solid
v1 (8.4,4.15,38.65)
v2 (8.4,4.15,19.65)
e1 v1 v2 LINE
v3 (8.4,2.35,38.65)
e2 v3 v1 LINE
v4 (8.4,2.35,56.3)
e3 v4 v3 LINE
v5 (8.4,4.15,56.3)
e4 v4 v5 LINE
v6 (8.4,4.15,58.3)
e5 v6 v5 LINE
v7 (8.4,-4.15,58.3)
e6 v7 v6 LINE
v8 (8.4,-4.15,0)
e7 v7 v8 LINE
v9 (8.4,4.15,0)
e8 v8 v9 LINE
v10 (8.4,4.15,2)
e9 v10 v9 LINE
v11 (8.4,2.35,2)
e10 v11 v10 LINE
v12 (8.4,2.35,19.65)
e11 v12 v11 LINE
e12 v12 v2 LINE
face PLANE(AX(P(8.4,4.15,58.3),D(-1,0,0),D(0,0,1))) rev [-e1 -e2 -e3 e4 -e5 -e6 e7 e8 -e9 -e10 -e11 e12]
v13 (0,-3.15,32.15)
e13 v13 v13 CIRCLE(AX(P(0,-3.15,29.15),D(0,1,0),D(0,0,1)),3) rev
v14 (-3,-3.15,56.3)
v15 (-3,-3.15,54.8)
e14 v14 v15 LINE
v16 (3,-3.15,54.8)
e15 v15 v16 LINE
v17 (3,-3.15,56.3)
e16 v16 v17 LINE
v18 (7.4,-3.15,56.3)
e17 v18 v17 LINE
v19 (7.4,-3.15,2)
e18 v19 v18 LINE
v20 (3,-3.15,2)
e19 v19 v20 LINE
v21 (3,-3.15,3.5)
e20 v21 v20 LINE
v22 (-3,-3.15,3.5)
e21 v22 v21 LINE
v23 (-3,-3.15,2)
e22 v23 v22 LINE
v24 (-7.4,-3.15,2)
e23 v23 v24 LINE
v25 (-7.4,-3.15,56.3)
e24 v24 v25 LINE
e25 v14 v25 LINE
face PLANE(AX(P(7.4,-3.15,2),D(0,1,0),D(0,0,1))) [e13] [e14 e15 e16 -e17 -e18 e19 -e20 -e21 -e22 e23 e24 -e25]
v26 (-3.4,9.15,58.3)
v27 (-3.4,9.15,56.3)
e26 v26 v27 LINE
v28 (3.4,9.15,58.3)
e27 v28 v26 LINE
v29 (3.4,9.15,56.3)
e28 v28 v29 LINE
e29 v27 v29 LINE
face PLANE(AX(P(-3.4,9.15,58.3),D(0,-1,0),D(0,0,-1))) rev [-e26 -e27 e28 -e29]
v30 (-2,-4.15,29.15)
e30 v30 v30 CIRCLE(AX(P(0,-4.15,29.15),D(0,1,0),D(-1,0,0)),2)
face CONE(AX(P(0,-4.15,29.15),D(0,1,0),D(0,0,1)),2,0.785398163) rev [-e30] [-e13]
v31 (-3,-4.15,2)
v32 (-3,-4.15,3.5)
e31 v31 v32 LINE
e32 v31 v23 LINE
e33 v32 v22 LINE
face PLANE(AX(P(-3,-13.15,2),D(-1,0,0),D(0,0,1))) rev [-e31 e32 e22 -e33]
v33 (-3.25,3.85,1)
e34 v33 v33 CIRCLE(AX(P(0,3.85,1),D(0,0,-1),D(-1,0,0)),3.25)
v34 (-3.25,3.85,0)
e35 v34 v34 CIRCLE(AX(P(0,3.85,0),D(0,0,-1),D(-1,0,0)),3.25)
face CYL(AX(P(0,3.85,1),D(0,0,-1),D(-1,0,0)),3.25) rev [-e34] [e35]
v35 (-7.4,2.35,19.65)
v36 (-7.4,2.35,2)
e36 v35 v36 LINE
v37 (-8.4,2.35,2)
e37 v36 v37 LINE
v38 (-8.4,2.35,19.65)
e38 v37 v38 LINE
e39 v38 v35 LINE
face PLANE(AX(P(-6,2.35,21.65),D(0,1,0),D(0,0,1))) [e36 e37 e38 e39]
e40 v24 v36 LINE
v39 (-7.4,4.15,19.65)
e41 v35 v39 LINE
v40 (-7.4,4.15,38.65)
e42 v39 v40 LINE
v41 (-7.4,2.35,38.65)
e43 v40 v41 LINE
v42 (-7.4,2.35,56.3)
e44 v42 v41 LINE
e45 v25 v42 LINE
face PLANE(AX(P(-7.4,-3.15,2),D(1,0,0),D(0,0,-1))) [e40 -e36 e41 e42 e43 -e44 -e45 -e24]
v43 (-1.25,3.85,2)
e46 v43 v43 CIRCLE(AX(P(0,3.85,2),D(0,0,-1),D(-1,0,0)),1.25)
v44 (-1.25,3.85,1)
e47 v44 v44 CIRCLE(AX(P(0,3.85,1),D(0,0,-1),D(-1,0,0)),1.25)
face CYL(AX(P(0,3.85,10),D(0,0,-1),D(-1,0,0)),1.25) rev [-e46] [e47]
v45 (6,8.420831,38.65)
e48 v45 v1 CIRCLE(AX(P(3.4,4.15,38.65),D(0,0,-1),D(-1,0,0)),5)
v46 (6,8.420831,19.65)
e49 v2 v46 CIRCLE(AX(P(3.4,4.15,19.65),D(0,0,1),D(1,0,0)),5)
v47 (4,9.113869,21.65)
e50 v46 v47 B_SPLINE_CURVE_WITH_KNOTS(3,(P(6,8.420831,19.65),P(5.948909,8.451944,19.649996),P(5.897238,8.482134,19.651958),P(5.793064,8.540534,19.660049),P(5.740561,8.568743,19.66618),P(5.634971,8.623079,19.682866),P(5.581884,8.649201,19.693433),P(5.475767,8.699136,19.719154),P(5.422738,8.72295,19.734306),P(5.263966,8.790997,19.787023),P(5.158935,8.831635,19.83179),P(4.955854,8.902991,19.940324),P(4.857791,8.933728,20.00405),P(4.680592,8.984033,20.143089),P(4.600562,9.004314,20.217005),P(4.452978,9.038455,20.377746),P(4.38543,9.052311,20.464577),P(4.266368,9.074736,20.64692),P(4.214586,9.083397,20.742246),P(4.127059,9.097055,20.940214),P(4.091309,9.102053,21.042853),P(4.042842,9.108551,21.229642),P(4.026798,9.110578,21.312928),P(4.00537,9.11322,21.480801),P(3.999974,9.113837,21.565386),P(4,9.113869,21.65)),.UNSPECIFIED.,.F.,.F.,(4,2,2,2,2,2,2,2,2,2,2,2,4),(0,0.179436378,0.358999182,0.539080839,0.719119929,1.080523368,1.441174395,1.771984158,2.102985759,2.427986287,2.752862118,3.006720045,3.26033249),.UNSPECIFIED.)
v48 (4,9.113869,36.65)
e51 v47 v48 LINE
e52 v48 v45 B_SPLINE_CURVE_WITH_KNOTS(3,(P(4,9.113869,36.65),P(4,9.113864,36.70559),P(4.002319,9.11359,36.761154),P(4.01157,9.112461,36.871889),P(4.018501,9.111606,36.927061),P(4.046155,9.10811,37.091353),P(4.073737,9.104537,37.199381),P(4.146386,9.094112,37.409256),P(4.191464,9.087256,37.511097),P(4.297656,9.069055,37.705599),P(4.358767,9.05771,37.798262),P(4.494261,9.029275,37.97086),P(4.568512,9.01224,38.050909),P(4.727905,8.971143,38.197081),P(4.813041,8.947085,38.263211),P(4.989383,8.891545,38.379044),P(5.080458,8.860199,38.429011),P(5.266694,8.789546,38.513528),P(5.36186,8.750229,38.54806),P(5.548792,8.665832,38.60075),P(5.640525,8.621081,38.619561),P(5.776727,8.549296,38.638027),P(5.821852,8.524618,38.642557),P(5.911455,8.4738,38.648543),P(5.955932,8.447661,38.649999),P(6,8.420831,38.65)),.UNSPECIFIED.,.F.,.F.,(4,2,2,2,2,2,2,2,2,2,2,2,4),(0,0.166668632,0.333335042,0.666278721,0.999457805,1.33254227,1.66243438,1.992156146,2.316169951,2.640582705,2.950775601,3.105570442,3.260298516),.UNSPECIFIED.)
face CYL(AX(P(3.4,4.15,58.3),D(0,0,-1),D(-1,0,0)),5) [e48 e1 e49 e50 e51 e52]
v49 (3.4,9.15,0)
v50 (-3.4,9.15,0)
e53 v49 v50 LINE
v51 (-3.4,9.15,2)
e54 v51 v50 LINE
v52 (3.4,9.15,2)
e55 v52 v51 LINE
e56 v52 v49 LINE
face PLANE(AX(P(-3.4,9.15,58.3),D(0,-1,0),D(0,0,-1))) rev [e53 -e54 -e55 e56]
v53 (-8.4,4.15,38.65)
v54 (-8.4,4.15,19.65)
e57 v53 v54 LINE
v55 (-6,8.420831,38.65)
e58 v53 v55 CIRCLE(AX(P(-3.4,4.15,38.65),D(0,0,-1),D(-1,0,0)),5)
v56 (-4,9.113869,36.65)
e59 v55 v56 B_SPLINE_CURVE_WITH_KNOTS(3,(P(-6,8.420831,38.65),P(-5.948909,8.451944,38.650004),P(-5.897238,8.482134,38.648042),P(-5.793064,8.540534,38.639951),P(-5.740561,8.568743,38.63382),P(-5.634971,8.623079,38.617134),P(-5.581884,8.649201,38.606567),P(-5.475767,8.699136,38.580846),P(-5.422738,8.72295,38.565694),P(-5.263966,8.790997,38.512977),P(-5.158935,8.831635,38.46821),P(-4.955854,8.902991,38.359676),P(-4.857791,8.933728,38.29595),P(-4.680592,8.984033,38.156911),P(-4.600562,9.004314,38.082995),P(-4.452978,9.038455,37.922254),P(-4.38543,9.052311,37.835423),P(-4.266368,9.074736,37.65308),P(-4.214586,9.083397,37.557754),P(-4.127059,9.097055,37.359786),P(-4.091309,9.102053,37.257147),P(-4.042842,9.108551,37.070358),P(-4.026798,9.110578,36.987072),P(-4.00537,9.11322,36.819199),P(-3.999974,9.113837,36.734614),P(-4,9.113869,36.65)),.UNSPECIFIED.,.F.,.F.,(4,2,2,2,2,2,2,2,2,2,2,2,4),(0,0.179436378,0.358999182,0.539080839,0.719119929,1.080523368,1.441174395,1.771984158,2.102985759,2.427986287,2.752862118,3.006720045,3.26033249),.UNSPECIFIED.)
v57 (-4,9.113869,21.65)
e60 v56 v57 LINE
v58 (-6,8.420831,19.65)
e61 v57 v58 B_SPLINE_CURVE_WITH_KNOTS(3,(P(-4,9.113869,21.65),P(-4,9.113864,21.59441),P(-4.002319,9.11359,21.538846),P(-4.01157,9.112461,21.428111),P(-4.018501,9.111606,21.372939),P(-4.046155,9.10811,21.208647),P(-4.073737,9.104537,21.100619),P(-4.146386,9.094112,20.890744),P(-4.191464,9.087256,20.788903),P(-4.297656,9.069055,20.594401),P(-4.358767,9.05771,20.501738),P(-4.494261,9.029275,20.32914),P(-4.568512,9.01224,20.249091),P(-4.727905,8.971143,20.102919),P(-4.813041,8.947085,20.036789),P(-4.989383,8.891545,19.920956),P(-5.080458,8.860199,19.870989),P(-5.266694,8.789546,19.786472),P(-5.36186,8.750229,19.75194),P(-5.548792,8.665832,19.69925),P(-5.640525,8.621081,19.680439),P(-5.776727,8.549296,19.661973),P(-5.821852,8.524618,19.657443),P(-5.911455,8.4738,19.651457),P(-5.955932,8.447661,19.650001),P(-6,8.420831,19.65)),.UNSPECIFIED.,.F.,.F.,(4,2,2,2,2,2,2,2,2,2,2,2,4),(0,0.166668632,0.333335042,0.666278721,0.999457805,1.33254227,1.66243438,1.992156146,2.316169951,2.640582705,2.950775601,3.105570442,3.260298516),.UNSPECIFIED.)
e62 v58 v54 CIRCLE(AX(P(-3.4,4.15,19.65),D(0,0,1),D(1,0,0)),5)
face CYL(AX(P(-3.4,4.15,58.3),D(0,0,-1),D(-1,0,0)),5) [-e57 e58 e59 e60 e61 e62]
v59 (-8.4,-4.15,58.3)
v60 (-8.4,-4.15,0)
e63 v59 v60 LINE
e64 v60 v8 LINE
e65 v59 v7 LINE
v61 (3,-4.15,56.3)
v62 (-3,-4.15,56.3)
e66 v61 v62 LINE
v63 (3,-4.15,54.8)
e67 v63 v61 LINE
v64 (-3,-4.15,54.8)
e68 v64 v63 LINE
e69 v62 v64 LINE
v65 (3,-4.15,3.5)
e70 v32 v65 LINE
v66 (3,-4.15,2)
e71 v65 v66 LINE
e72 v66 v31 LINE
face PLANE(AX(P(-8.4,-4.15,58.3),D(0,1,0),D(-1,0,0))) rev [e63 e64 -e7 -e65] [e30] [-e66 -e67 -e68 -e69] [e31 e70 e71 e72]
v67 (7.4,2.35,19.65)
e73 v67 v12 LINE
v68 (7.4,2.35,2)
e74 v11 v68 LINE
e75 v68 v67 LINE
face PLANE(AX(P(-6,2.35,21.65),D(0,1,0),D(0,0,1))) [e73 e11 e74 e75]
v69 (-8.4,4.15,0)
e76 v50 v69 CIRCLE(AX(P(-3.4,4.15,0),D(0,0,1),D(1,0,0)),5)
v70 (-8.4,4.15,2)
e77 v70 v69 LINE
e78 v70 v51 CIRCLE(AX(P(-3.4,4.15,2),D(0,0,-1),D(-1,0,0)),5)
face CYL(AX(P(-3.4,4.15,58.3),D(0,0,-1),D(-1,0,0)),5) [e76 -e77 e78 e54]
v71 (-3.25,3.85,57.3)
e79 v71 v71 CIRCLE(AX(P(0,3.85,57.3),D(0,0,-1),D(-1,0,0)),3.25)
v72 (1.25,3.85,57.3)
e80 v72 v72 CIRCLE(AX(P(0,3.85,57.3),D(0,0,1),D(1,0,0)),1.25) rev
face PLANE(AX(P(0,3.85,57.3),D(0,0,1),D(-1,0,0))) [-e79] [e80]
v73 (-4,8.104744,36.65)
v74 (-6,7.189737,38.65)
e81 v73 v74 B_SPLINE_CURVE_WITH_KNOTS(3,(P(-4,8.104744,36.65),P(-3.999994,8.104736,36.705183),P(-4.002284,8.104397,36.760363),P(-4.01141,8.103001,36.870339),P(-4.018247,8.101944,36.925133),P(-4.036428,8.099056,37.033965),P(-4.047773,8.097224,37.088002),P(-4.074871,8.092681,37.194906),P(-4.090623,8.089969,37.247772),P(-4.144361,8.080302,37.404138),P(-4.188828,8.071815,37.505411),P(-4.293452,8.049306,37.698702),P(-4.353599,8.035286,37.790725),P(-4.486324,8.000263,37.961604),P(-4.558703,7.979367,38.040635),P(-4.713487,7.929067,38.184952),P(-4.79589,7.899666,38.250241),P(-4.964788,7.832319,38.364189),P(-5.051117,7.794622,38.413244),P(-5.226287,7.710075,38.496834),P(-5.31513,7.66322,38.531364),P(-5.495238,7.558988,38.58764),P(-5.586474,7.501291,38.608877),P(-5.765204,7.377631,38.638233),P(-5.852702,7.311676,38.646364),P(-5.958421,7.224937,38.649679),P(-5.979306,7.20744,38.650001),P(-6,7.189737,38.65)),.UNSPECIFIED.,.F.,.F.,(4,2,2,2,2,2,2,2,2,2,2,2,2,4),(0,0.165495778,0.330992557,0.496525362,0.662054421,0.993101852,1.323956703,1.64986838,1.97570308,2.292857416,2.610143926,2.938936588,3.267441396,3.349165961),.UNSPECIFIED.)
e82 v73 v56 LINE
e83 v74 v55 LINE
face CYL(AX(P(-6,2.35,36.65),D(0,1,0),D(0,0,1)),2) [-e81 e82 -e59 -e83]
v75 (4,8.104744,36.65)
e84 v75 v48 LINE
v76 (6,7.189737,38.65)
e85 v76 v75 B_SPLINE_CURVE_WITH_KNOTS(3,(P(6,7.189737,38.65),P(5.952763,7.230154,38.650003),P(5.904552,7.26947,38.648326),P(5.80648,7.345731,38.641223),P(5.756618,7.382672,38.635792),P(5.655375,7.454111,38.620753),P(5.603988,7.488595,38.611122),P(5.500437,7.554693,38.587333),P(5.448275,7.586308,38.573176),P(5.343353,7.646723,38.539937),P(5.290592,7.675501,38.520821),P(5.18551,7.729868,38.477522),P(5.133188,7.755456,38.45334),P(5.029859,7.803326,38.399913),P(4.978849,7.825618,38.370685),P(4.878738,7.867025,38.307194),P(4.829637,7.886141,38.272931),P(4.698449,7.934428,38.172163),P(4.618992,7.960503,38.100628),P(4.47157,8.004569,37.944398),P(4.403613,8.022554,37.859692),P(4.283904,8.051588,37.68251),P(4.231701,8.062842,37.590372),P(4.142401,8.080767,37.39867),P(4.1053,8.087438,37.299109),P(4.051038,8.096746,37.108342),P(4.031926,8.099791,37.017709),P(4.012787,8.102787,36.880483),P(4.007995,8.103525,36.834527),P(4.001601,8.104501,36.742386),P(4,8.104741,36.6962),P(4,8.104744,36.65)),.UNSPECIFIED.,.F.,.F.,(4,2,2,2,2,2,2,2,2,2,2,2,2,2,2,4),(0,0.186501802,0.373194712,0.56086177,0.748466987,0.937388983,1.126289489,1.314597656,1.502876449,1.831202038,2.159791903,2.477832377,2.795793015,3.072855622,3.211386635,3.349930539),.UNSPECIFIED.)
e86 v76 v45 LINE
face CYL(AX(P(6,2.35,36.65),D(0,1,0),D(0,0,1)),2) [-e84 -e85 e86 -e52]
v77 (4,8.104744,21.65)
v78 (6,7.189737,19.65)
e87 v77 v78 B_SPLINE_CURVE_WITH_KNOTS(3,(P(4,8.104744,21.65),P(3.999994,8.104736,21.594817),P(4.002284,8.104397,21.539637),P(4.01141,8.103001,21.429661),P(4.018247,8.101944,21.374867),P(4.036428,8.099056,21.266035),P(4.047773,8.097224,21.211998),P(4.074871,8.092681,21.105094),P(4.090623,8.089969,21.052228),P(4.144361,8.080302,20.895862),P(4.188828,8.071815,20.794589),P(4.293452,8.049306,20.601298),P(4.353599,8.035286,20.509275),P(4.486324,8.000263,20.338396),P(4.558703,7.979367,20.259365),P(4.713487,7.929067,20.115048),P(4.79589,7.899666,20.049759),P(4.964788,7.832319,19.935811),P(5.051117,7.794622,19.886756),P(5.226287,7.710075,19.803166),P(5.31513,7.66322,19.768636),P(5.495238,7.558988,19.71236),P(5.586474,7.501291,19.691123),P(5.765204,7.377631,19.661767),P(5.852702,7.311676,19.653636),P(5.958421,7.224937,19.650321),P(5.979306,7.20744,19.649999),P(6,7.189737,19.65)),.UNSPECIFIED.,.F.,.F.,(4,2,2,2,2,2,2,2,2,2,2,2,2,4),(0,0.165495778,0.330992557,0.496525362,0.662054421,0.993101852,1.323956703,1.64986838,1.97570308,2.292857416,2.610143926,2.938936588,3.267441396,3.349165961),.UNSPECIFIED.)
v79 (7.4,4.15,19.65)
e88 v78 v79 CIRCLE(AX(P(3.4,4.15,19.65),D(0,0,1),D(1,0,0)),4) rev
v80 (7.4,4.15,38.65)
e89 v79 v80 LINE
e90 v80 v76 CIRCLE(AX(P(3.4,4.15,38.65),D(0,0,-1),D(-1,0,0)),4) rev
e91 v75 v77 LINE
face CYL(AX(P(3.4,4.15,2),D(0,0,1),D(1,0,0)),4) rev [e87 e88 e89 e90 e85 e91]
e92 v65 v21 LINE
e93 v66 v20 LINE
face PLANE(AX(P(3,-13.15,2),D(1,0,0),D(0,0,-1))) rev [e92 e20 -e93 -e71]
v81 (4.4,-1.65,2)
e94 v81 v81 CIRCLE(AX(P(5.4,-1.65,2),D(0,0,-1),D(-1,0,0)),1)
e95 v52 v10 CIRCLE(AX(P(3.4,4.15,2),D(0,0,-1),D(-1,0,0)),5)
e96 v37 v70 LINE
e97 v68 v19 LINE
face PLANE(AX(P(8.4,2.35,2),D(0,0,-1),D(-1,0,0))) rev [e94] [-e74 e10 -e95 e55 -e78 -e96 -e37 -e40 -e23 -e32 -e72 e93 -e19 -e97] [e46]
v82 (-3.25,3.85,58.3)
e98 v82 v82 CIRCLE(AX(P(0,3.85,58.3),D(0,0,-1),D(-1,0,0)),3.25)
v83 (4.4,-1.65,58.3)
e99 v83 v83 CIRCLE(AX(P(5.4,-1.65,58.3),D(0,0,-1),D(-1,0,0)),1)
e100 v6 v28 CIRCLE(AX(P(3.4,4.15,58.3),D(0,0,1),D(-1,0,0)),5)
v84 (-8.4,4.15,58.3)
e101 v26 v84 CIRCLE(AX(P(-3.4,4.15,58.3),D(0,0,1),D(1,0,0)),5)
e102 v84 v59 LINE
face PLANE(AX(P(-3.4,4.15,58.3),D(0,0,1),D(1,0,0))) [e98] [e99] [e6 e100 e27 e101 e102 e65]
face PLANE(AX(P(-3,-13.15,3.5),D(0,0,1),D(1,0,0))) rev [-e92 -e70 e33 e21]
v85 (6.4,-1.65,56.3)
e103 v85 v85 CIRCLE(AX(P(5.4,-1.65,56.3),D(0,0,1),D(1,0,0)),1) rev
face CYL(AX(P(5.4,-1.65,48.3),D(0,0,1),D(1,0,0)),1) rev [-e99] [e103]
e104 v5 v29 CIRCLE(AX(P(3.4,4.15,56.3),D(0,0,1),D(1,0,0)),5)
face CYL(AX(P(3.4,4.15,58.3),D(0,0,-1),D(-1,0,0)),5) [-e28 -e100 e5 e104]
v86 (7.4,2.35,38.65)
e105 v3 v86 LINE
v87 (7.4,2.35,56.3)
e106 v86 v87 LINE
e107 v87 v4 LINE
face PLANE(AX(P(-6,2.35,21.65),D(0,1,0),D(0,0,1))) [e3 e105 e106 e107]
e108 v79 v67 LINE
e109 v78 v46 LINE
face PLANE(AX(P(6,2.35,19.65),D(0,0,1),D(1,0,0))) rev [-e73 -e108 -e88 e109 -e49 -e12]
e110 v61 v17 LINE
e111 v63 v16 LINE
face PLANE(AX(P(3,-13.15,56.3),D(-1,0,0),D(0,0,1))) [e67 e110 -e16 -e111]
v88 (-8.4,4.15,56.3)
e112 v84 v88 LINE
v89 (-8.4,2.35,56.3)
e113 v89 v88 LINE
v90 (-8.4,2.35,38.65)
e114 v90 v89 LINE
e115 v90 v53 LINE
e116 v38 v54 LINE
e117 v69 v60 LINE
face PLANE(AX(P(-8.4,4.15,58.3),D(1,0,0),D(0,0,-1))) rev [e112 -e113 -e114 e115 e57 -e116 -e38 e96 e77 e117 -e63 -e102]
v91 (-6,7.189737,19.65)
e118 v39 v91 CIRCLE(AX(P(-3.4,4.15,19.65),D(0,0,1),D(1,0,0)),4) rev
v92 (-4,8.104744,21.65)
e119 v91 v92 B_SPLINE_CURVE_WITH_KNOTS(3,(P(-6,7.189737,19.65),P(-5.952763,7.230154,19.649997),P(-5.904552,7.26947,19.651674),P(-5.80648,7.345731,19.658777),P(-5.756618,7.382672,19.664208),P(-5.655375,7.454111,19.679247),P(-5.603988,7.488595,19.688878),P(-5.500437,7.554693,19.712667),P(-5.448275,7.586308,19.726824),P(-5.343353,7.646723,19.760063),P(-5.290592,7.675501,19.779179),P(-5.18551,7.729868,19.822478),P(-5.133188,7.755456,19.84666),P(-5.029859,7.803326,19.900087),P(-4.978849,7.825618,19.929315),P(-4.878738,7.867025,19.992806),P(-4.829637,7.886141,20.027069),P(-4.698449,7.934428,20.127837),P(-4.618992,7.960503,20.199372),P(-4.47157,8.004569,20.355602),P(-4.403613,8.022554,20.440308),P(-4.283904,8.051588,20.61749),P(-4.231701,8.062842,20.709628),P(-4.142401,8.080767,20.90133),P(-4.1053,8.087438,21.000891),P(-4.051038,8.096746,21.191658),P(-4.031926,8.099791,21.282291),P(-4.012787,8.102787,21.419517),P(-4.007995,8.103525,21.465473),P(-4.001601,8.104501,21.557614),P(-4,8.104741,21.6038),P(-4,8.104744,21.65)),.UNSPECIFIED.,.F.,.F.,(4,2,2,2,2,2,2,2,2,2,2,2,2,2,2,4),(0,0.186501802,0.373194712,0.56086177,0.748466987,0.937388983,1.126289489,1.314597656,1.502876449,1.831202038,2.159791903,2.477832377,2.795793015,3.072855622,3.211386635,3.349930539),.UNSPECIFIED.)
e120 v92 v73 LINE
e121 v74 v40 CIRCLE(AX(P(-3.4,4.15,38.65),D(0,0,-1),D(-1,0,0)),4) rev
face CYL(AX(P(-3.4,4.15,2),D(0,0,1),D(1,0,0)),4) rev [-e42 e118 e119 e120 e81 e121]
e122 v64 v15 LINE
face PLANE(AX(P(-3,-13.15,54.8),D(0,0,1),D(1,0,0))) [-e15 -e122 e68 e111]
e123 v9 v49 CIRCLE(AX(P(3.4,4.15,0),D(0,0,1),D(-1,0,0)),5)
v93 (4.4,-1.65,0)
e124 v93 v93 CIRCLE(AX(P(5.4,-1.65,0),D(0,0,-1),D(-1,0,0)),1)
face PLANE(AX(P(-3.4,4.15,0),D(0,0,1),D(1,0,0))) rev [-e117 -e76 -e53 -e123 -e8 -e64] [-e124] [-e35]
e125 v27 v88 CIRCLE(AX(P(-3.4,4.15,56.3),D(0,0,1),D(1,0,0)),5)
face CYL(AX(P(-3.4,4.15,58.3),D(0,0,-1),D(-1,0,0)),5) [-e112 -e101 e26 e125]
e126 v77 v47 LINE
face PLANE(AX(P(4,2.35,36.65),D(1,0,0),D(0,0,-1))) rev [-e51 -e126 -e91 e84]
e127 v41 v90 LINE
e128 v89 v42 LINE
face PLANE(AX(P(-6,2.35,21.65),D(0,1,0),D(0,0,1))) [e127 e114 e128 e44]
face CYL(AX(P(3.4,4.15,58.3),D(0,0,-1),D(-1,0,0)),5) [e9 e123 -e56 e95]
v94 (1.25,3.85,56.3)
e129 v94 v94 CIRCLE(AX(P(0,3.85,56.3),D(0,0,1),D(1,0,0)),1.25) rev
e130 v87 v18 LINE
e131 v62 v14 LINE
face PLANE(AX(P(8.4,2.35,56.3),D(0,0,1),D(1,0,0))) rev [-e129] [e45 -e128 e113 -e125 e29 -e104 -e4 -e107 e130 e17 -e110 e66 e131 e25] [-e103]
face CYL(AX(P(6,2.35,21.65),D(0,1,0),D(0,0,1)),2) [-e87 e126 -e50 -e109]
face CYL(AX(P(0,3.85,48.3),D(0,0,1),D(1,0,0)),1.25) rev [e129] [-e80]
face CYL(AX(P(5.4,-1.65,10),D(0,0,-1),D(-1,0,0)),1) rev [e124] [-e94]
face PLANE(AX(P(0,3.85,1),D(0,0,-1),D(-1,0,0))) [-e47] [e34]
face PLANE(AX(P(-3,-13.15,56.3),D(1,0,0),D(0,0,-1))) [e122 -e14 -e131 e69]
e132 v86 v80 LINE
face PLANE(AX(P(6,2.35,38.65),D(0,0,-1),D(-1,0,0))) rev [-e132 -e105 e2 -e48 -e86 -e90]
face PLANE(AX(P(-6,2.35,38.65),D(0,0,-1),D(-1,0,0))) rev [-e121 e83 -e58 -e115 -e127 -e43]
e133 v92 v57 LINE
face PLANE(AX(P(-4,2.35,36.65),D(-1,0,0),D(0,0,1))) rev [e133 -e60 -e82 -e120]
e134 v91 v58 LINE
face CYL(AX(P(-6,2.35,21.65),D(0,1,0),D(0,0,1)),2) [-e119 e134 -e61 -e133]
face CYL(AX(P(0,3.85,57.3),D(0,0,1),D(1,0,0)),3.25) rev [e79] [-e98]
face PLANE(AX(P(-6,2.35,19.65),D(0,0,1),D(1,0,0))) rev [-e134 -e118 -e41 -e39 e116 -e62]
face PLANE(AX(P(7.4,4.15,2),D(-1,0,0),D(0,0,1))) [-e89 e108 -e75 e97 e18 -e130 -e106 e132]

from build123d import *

# Parameters (mm, degrees)
EXTRUDE_1_DEPTH     = 58.3
CUT_EXTRUDE_1_DEPTH = 6.8
CUT_EXTRUDE_2_DEPTH = 54.3
SKETCH_5_R          = 2
CUT_EXTRUDE_4_DEPTH = 55
CHAMFER_2_SIZE      = 1
SKETCH_7_R          = 3.25
CUT_EXTRUDE_5_DEPTH = 1
SKETCH_8_R          = 1.25
CUT_EXTRUDE_6_DEPTH = 10
SKETCH_9_R          = 1
CUT_EXTRUDE_7_DEPTH = 10
SKETCH_11_W         = 6
SKETCH_11_H         = 1.5
CUT_EXTRUDE_8_DEPTH = 10


with BuildPart() as part:
    # Эскиз1 → Бобышка-Вытянуть1 (new body)
    with BuildSketch(Plane.XY):
        with BuildLine():
            Line((-3.4, 9.15), (3.4, 9.15))
            ThreePointArc((3.4, 9.15), (6.935533906, 7.685533906), (8.4, 4.15))
            Line((8.4, 4.15), (8.4, -4.15))
            Line((8.4, -4.15), (-8.4, -4.15))
            Line((-8.4, -4.15), (-8.4, 4.15))
            ThreePointArc((-8.4, 4.15), (-6.935533906, 7.685533906), (-3.4, 9.15))
        make_face()
    extrude(amount=EXTRUDE_1_DEPTH)

    # Эскиз2 → Вырез-Вытянуть1 (cut)
    with BuildSketch(Plane(origin=(0, 9.15, 0), x_dir=(1, 0, 0), z_dir=(0, 1, 0))):
        with BuildLine():
            Line((8.4, -19.65), (8.4, -2))
            Line((8.4, -2), (-8.4, -2))
            Line((-8.4, -2), (-8.4, -19.65))
            Line((-8.4, -19.65), (-6, -19.65))
            ThreePointArc((-6, -19.65), (-4.585786438, -20.235786438), (-4, -21.65))
            Line((-4, -21.65), (-4, -36.65))
            ThreePointArc((-4, -36.65), (-4.585786438, -38.064213562), (-6, -38.65))
            Line((-6, -38.65), (-8.4, -38.65))
            Line((-8.4, -38.65), (-8.4, -56.3))
            Line((-8.4, -56.3), (8.4, -56.3))
            Line((8.4, -56.3), (8.4, -38.65))
            Line((8.4, -38.65), (6, -38.65))
            ThreePointArc((6, -38.65), (4.585786438, -38.064213562), (4, -36.65))
            Line((4, -36.65), (4, -21.65))
            ThreePointArc((4, -21.65), (4.585786438, -20.235786438), (6, -19.65))
            Line((6, -19.65), (8.4, -19.65))
        make_face()
    extrude(amount=-CUT_EXTRUDE_1_DEPTH, mode=Mode.SUBTRACT)

    # Эскиз3 → Вырез-Вытянуть2 (cut)
    with BuildSketch(Plane(origin=(0, 0, 56.3), x_dir=(-1, 0, 0), z_dir=(0, 0, -1))):
        with BuildLine():
            Line((-7.4, 4.15), (-7.4, -3.15))
            Line((-7.4, -3.15), (7.4, -3.15))
            Line((7.4, -3.15), (7.4, 4.15))
            ThreePointArc((7.4, 4.15), (6.228427125, 6.978427125), (3.4, 8.15))
            Line((3.4, 8.15), (-3.4, 8.15))
            ThreePointArc((-3.4, 8.15), (-6.228427125, 6.978427125), (-7.4, 4.15))
        make_face()
    extrude(amount=CUT_EXTRUDE_2_DEPTH, mode=Mode.SUBTRACT)

    # Эскиз5 → Вырез-Вытянуть4 (cut)
    with BuildSketch(Plane(origin=(0, -3.15, 0), x_dir=(1, 0, 0), z_dir=(0, 1, 0))):
        with Locations(Location((0, -29.15, 0), (0, 0, 270))):
            Circle(SKETCH_5_R)
    extrude(amount=-CUT_EXTRUDE_4_DEPTH, mode=Mode.SUBTRACT)

    # Фаска2
    chamfer_2_edges = [part.edges().sort_by_distance(p)[0] for p in [
        (0, -3.15, 27.15),
    ]]
    chamfer(chamfer_2_edges, length=CHAMFER_2_SIZE - 0.0001)  # a hair under: the kernel refuses the full size

    # Эскиз7 → Вырез-Вытянуть5 (cut)
    with BuildSketch(Plane(origin=(0, 0, 0), x_dir=(-1, 0, 0), z_dir=(0, 0, -1))):
        with Locations((0, 3.85)):
            Circle(SKETCH_7_R)
    cut_extrude_5 = extrude(amount=-CUT_EXTRUDE_5_DEPTH, mode=Mode.SUBTRACT)

    # Эскиз8 → Вырез-Вытянуть6 (cut)
    with BuildSketch(Plane(origin=(0, 0, 0), x_dir=(-1, 0, 0), z_dir=(0, 0, -1))):
        with Locations((0, 3.85)):
            Circle(SKETCH_8_R)
    cut_extrude_6 = extrude(amount=-CUT_EXTRUDE_6_DEPTH, mode=Mode.SUBTRACT)

    # Эскиз9 → Вырез-Вытянуть7 (cut)
    with BuildSketch(Plane(origin=(0, 0, 0), x_dir=(-1, 0, 0), z_dir=(0, 0, -1))):
        with Locations((-5.4, -1.65)):
            Circle(SKETCH_9_R)
    cut_extrude_7 = extrude(amount=-CUT_EXTRUDE_7_DEPTH, mode=Mode.SUBTRACT)

    # Эскиз11 → Вырез-Вытянуть8 (cut)
    with BuildSketch(Plane(origin=(0, -3.15, 0), x_dir=(1, 0, 0), z_dir=(0, 1, 0))):
        with Locations((0, -2.75)):
            Rectangle(SKETCH_11_W, SKETCH_11_H)
    cut_extrude_8 = extrude(amount=-CUT_EXTRUDE_8_DEPTH, mode=Mode.SUBTRACT)

    # Зеркальное отражение1: Вырез-Вытянуть5, Вырез-Вытянуть6, Вырез-Вытянуть7, Вырез-Вытянуть8 across plane
    add(cut_extrude_5.mirror(Plane(origin=(0, 0, 29.15), x_dir=(1, 0, 0), z_dir=(0, 0, -1))), mode=Mode.SUBTRACT)
    add(cut_extrude_6.mirror(Plane(origin=(0, 0, 29.15), x_dir=(1, 0, 0), z_dir=(0, 0, -1))), mode=Mode.SUBTRACT)
    add(cut_extrude_7.mirror(Plane(origin=(0, 0, 29.15), x_dir=(1, 0, 0), z_dir=(0, 0, -1))), mode=Mode.SUBTRACT)
    add(cut_extrude_8.mirror(Plane(origin=(0, 0, 29.15), x_dir=(1, 0, 0), z_dir=(0, 0, -1))), mode=Mode.SUBTRACT)


solid = part.part
